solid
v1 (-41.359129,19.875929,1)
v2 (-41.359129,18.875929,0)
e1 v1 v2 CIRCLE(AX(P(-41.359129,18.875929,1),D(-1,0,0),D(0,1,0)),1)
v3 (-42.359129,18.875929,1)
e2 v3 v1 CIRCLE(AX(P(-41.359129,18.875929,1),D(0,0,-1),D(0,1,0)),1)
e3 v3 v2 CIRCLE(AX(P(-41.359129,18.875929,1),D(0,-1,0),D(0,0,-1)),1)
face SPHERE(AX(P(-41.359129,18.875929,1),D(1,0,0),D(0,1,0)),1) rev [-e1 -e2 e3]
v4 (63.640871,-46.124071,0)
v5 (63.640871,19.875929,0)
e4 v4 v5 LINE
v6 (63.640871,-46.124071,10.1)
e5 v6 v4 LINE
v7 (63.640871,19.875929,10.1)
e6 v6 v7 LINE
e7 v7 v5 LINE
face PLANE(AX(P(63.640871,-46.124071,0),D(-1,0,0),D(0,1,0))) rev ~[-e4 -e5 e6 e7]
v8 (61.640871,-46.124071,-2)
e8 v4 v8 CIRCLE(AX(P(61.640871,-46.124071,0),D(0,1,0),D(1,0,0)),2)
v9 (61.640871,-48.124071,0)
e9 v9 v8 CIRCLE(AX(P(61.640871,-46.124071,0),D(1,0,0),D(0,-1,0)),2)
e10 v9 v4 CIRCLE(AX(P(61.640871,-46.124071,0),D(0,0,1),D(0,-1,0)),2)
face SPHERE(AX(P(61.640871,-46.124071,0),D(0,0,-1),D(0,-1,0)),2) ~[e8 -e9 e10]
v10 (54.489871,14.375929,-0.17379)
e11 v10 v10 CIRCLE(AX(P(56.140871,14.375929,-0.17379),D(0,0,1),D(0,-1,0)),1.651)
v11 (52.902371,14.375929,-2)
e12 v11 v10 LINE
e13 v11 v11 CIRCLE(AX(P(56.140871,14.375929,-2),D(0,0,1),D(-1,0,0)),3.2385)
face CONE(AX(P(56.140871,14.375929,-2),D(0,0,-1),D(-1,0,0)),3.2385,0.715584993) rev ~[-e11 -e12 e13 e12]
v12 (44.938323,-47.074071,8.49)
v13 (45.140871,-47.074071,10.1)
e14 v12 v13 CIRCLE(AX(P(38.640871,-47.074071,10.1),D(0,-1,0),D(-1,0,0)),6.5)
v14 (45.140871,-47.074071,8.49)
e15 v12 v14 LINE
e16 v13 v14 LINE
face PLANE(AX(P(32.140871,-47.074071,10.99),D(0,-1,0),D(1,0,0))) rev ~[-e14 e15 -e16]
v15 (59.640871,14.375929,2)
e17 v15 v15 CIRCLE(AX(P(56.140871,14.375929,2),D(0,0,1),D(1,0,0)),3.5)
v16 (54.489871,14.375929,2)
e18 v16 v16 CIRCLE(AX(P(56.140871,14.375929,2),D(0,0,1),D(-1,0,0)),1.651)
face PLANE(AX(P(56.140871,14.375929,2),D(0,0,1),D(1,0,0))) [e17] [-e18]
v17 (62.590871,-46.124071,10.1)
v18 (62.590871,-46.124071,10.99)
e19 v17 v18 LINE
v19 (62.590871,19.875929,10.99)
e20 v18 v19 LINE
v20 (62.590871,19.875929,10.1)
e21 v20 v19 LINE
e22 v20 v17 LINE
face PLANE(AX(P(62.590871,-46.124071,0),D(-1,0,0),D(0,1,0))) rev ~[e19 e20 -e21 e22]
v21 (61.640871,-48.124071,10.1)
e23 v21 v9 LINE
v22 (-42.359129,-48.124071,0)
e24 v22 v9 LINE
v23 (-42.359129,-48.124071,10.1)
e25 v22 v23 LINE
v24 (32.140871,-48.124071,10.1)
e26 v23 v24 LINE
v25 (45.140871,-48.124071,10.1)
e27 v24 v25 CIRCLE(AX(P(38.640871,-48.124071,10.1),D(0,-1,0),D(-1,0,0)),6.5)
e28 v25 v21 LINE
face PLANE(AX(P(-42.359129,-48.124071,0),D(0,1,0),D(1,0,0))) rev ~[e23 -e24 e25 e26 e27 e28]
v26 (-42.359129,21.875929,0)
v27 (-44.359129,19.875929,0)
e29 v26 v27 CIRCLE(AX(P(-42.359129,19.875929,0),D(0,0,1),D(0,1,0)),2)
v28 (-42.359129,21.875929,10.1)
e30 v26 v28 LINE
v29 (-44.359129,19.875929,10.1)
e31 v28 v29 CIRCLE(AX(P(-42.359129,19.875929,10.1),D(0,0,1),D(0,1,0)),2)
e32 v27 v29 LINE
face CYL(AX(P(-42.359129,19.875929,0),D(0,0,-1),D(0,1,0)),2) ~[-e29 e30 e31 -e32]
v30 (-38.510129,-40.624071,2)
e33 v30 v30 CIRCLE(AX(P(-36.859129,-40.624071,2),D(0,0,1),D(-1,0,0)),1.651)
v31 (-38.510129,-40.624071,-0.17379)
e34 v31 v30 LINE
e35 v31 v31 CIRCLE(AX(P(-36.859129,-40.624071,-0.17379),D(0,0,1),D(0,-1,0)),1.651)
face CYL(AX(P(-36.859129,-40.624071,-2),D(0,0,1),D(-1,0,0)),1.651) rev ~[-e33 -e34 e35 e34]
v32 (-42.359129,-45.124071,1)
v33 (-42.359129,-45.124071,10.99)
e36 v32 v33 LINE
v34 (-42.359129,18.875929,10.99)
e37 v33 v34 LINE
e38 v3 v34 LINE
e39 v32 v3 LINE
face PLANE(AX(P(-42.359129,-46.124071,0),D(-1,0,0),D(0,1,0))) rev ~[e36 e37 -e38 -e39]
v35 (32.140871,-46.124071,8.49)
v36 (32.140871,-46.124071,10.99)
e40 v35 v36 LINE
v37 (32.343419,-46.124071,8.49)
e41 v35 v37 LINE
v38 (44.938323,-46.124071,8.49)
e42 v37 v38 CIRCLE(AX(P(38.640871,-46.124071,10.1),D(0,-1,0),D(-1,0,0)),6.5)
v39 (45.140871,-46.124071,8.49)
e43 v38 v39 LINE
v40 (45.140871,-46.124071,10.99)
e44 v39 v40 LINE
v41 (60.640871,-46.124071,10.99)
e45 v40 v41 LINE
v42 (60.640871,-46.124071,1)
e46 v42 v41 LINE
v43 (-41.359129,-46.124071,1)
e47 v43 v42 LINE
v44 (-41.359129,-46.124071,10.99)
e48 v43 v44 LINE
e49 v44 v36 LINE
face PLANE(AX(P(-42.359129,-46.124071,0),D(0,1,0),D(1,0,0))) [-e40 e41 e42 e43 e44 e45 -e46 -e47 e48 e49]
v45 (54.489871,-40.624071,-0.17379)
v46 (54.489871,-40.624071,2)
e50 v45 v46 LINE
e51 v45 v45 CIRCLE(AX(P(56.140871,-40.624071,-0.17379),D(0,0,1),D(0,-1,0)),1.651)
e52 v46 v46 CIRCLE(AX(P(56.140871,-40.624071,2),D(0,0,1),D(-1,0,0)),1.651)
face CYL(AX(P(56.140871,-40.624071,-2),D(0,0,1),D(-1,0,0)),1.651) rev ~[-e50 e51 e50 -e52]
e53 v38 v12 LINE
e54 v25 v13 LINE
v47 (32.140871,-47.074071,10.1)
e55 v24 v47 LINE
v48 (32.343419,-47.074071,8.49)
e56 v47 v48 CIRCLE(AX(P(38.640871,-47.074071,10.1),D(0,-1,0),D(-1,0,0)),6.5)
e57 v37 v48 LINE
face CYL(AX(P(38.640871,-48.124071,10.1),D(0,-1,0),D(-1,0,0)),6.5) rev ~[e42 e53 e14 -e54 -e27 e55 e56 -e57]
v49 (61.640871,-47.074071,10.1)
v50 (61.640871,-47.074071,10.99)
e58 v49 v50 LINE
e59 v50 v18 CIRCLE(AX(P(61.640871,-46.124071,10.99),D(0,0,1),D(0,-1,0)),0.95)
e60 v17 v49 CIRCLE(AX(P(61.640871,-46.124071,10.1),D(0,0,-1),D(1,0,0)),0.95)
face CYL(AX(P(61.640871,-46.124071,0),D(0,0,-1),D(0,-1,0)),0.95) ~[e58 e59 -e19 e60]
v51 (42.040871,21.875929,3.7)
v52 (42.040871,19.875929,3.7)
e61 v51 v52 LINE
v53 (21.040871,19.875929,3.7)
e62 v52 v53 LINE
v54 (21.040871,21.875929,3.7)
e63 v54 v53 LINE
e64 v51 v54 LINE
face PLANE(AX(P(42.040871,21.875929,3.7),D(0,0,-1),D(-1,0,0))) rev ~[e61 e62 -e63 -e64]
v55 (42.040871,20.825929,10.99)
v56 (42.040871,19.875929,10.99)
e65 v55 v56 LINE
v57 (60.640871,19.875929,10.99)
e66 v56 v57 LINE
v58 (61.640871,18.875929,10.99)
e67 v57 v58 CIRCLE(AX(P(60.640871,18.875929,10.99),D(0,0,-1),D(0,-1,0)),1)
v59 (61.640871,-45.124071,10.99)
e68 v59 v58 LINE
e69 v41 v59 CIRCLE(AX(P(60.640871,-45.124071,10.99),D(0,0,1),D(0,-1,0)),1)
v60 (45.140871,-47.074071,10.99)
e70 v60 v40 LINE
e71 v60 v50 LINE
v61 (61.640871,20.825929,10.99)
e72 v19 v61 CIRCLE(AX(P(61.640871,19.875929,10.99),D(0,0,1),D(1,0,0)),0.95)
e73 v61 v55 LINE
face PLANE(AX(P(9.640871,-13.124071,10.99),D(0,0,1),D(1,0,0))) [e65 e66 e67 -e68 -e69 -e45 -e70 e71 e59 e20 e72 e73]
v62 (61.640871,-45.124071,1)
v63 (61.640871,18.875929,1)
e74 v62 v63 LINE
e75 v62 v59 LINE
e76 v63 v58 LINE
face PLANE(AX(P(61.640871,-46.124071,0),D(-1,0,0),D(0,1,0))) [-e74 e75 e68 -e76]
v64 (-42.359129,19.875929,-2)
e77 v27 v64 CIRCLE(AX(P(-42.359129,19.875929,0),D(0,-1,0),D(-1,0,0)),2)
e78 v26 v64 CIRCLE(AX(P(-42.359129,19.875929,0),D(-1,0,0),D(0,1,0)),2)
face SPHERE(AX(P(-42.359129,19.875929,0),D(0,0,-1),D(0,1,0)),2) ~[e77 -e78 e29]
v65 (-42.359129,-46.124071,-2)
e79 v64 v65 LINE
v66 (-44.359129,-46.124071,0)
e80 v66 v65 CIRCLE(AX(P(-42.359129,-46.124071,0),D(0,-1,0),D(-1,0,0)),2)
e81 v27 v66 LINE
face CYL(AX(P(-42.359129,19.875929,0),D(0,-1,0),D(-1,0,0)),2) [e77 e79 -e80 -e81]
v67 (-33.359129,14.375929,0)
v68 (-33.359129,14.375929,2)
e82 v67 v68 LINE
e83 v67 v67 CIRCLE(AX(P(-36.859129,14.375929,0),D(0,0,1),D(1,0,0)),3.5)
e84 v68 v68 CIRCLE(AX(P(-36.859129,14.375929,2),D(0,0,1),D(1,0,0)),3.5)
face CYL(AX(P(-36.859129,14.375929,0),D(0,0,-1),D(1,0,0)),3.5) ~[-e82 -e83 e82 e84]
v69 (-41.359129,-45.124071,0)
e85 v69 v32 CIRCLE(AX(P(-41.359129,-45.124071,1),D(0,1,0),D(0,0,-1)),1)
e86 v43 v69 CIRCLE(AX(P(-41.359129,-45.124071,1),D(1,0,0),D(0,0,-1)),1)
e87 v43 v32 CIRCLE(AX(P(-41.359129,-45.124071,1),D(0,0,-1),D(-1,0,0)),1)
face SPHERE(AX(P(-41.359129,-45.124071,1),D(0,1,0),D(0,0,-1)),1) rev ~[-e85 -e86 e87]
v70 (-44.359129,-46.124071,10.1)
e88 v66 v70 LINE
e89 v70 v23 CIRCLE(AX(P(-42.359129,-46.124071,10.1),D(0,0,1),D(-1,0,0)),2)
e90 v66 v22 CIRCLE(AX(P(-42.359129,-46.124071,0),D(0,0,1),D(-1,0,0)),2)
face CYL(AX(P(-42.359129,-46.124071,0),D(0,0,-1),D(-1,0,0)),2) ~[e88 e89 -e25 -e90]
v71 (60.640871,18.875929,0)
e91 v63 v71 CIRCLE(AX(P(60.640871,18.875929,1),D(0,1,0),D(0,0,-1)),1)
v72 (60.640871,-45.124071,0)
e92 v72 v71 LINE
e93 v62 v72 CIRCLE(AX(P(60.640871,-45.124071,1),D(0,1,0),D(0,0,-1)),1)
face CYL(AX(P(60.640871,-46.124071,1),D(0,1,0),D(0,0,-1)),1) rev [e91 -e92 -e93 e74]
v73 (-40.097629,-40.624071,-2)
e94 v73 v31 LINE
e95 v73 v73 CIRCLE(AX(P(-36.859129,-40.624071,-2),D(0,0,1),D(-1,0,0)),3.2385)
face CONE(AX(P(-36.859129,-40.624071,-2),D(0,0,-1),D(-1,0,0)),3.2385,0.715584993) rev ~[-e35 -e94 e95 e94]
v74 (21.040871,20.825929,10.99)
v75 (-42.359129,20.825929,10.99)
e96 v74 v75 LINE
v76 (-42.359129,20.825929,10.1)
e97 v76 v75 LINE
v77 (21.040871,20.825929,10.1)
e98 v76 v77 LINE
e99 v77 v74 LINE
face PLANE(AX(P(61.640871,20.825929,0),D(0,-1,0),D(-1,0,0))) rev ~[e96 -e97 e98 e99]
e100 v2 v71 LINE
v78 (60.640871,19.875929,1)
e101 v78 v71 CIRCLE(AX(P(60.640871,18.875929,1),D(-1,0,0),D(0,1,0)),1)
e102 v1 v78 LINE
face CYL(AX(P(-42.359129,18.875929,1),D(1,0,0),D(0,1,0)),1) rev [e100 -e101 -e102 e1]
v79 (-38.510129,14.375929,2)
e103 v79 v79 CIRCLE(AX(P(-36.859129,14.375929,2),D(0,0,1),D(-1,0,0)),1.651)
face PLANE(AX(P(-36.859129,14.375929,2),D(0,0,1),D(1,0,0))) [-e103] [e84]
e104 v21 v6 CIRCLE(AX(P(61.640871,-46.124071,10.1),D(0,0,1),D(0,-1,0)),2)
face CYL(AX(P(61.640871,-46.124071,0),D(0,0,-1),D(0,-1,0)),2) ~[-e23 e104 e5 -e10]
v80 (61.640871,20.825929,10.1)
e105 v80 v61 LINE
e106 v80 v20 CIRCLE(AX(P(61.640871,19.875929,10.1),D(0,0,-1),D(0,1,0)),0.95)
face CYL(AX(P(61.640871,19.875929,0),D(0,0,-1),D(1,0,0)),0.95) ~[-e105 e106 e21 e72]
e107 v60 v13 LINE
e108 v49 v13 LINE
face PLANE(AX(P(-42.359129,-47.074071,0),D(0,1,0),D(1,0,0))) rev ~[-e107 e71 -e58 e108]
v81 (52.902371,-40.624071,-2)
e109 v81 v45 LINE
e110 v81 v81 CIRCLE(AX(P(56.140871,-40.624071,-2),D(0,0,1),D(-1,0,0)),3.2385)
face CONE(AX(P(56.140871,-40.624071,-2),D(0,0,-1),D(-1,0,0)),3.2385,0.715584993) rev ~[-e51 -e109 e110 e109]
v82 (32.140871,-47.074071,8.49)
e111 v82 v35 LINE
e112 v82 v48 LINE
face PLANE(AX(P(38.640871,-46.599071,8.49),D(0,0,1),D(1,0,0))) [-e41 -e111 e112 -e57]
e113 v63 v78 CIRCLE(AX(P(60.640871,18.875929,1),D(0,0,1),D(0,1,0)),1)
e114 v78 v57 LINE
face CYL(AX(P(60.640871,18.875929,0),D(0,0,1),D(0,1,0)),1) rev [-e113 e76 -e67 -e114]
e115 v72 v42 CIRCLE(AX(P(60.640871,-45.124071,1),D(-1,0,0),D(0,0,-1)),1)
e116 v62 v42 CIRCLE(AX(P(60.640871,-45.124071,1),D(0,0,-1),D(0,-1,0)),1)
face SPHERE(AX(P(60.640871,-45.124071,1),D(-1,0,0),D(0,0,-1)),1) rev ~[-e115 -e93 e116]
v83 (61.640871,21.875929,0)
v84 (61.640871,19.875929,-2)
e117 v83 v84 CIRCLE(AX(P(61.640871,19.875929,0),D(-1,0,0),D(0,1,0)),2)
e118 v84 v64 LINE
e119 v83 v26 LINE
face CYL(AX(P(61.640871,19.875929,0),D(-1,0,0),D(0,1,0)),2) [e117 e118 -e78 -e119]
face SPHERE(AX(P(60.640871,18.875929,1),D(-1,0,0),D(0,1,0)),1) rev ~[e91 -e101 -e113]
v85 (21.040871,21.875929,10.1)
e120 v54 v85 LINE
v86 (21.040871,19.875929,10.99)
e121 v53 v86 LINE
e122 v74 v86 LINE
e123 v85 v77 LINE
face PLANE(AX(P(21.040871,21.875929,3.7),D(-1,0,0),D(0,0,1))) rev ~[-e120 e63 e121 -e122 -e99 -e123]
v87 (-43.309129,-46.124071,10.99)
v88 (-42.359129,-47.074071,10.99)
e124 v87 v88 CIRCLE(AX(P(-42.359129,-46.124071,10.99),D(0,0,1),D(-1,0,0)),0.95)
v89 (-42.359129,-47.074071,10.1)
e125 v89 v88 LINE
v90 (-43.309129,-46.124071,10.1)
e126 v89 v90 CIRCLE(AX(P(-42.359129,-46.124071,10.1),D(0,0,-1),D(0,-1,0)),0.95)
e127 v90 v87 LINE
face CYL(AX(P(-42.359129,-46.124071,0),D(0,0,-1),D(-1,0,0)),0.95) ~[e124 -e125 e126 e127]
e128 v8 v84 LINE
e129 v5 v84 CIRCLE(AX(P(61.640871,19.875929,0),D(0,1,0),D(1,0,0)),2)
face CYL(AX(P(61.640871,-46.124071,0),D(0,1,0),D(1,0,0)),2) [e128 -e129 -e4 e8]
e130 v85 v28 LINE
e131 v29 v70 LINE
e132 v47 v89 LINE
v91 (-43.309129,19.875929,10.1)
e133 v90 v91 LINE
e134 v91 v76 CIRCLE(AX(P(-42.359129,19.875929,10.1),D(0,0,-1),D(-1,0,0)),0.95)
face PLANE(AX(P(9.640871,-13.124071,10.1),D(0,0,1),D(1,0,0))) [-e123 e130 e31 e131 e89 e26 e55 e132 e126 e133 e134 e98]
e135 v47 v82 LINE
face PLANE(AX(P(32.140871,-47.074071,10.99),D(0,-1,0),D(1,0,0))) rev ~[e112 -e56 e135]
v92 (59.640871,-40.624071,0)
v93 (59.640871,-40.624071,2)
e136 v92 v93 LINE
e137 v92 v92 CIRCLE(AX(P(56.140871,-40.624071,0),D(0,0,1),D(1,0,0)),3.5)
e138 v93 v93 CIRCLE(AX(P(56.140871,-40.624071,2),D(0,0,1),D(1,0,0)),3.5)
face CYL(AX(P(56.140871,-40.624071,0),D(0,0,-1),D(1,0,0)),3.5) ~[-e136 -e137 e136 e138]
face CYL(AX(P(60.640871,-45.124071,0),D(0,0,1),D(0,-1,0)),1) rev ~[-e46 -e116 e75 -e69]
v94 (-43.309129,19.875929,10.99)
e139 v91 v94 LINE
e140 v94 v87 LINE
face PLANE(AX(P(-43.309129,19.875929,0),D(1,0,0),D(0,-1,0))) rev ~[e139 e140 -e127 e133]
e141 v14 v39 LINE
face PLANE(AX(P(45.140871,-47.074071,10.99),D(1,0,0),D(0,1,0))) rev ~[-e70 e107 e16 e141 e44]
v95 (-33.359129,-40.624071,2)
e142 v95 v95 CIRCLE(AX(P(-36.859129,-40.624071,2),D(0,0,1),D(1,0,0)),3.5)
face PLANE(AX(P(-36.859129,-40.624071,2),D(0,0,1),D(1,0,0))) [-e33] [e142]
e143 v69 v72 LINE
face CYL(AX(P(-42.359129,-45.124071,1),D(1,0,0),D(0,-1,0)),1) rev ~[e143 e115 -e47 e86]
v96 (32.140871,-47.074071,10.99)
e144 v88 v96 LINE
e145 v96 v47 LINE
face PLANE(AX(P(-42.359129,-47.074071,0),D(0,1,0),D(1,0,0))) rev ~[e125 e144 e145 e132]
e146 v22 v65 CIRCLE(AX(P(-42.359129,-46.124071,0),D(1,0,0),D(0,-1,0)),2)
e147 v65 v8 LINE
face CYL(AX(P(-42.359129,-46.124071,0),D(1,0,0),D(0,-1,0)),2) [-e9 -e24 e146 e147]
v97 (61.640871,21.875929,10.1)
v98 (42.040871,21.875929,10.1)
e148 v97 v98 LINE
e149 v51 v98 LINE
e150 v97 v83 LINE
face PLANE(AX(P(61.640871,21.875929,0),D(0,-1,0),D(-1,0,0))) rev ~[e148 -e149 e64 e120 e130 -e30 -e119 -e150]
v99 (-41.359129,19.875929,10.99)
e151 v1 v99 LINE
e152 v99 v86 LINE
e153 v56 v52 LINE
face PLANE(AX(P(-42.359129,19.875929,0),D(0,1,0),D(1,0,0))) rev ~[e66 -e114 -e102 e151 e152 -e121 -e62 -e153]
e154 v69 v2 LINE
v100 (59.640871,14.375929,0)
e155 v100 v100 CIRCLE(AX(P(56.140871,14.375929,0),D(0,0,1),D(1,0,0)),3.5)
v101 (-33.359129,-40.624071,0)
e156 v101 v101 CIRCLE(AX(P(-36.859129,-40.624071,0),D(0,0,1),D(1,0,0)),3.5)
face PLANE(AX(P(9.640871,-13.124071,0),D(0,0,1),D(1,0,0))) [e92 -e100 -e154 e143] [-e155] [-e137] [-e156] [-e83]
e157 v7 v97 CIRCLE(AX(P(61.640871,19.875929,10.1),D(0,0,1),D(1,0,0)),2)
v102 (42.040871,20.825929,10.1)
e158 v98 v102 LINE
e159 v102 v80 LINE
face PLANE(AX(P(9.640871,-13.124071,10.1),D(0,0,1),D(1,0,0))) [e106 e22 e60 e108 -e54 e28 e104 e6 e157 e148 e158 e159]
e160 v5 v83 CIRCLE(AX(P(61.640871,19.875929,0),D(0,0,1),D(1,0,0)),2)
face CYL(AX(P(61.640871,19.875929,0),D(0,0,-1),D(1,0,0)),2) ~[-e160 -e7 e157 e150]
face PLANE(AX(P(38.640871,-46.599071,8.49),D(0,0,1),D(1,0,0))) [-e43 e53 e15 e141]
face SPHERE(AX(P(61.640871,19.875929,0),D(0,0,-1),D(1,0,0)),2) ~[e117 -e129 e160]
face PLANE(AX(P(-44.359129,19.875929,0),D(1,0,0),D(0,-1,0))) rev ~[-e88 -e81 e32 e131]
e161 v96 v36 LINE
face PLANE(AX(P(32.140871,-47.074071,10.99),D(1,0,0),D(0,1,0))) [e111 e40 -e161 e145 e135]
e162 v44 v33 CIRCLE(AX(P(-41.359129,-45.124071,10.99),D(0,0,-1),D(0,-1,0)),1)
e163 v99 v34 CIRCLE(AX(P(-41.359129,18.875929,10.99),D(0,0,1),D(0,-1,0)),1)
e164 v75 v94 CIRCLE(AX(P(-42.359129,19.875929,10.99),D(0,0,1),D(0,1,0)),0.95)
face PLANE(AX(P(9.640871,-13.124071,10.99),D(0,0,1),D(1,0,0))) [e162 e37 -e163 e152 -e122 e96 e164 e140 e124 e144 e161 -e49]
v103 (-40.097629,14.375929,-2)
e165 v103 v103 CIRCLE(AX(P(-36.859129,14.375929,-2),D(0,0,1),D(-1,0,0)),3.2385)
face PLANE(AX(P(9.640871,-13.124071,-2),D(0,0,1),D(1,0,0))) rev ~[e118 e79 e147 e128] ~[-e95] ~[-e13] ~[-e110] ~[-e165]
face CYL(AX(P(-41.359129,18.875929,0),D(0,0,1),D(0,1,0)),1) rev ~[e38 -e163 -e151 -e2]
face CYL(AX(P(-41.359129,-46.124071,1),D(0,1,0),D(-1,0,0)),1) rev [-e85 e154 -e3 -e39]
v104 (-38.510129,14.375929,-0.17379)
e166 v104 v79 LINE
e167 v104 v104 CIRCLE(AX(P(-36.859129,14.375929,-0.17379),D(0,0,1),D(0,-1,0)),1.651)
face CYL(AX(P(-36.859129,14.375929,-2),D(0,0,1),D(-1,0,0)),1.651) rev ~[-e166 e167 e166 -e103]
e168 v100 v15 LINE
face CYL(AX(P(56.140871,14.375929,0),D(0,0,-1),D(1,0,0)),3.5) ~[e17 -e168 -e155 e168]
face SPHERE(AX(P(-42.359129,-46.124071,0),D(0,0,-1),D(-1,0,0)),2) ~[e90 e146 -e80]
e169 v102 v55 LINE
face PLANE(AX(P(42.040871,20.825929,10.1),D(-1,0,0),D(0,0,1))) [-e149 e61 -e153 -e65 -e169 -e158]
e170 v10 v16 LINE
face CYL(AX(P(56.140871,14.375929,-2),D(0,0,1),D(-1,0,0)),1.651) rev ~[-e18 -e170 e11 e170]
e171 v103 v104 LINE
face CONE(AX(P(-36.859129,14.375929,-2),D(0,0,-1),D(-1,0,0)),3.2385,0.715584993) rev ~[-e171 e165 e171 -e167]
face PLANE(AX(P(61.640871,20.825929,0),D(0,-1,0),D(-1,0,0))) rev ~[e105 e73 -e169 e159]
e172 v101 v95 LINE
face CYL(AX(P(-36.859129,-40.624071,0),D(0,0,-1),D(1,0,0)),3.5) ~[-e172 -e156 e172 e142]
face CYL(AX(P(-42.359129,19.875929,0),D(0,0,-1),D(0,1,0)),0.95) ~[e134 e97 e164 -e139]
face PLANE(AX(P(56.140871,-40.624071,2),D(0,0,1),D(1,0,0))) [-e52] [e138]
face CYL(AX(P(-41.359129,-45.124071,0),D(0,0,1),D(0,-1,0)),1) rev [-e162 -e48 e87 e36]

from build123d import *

# Parameters (mm, degrees)
F0_W           = 104
F0_H           = 66
F0_R           = 3
F1_DEPTH       = 2
F2_DEPTH       = 10.99
F3_DEPTH       = 10.1
F4_R           = 3.5
F5_DEPTH       = 2
F7_D           = 3.302
F7_CSINK_D     = 6.477
F7_CSINK_ANGLE = 82
F8_W           = 21
F8_H           = 6.4
F9_DEPTH       = 2.5
F10_W          = 13
F10_H          = 0.95
F11_DEPTH      = 2.5
F13_DEPTH      = 2.5
F14_R          = 2
F15_R          = 1
F16_W          = 21
F16_H          = 0.89
F17_DEPTH      = 2.5


# Not quite as in the source:
# - a feature names something its author has since deleted; it is built from what else it names


with BuildPart() as f1:
    # F0 (on Top) → F1 (new body)
    with BuildSketch(Plane.XY):
        with BuildLine():
            Line((61.6408709802, 21.8759292028), (-42.3591290198, 21.8759292028))
            ThreePointArc((-42.3591290198, 21.8759292028), (-43.7733425821, 21.2901427652), (-44.3591290198, 19.8759292028))
            Line((-44.3591290198, 19.8759292028), (-44.3591290198, -46.1240707972))
            ThreePointArc((-44.3591290198, -46.1240707972), (-43.7733425821, -47.5382843595), (-42.3591290198, -48.1240707972))
            Line((-42.3591290198, -48.1240707972), (61.6408709802, -48.1240707972))
            ThreePointArc((61.6408709802, -48.1240707972), (63.0550845426, -47.5382843595), (63.6408709802, -46.1240707972))
            Line((63.6408709802, -46.1240707972), (63.6408709802, 19.8759292028))
            ThreePointArc((63.6408709802, 19.8759292028), (63.0550845426, 21.2901427652), (61.6408709802, 21.8759292028))
        make_face()
        with BuildLine():
            ThreePointArc((-43.3091290198, 19.8759292028), (-43.0308804619, 20.547680645), (-42.3591290198, 20.8259292028))
            Line((-42.3591290198, 20.8259292028), (61.6408709802, 20.8259292028))
            ThreePointArc((61.6408709802, 20.8259292028), (62.3126224224, 20.547680645), (62.5908709802, 19.8759292028))
            Line((62.5908709802, 19.8759292028), (62.5908709802, -46.1240707972))
            ThreePointArc((62.5908709802, -46.1240707972), (62.3126224224, -46.7958222393), (61.6408709802, -47.0740707972))
            Line((61.6408709802, -47.0740707972), (-42.3591290198, -47.0740707972))
            ThreePointArc((-42.3591290198, -47.0740707972), (-43.0308804619, -46.7958222393), (-43.3091290198, -46.1240707972))
            Line((-43.3091290198, -46.1240707972), (-43.3091290198, 19.8759292028))
        make_face(mode=Mode.SUBTRACT)
        with BuildLine():
            Line((61.6408709802, 20.8259292028), (-42.3591290198, 20.8259292028))
            ThreePointArc((-42.3591290198, 20.8259292028), (-43.0308804619, 20.547680645), (-43.3091290198, 19.8759292028))
            Line((-43.3091290198, 19.8759292028), (-43.3091290198, -46.1240707972))
            ThreePointArc((-43.3091290198, -46.1240707972), (-43.0308804619, -46.7958222393), (-42.3591290198, -47.0740707972))
            Line((-42.3591290198, -47.0740707972), (61.6408709802, -47.0740707972))
            ThreePointArc((61.6408709802, -47.0740707972), (62.3126224224, -46.7958222393), (62.5908709802, -46.1240707972))
            Line((62.5908709802, -46.1240707972), (62.5908709802, 19.8759292028))
            ThreePointArc((62.5908709802, 19.8759292028), (62.3126224224, 20.547680645), (61.6408709802, 20.8259292028))
        make_face()
        with Locations((9.6408709802, -13.1240707972)):
            Rectangle(F0_W, F0_H, mode=Mode.SUBTRACT)
        with Locations((9.6408709802, -13.1240707972)):
            Rectangle(F0_W, F0_H)
        with Locations((-36.8591290198, -40.6240707972)):
            Circle(F0_R, mode=Mode.SUBTRACT)
        with Locations((57.1408709802, -40.6240707972)):
            Circle(F0_R, mode=Mode.SUBTRACT)
        with Locations((-36.8591290198, 14.3759292028)):
            Circle(F0_R, mode=Mode.SUBTRACT)
        with Locations((57.1408709802, 14.3759292028)):
            Circle(F0_R, mode=Mode.SUBTRACT)
        with Locations((-36.8591290198, -40.6240707972)):
            Circle(F0_R)
        with Locations((57.1408709802, -40.6240707972)):
            Circle(F0_R)
        with Locations((-36.8591290198, 14.3759292028)):
            Circle(F0_R)
        with Locations((57.1408709802, 14.3759292028)):
            Circle(F0_R)
    extrude(amount=-F1_DEPTH)

    # F0 (on Top) → F2 (join)
    with BuildSketch(Plane.XY):
        with BuildLine():
            Line((61.6408709802, 20.8259292028), (-42.3591290198, 20.8259292028))
            ThreePointArc((-42.3591290198, 20.8259292028), (-43.0308804619, 20.547680645), (-43.3091290198, 19.8759292028))
            Line((-43.3091290198, 19.8759292028), (-43.3091290198, -46.1240707972))
            ThreePointArc((-43.3091290198, -46.1240707972), (-43.0308804619, -46.7958222393), (-42.3591290198, -47.0740707972))
            Line((-42.3591290198, -47.0740707972), (61.6408709802, -47.0740707972))
            ThreePointArc((61.6408709802, -47.0740707972), (62.3126224224, -46.7958222393), (62.5908709802, -46.1240707972))
            Line((62.5908709802, -46.1240707972), (62.5908709802, 19.8759292028))
            ThreePointArc((62.5908709802, 19.8759292028), (62.3126224224, 20.547680645), (61.6408709802, 20.8259292028))
        make_face()
        with Locations((9.6408709802, -13.1240707972)):
            Rectangle(F0_W, F0_H, mode=Mode.SUBTRACT)
    extrude(amount=F2_DEPTH)

    # F0 (on Top) → F3 (join)
    with BuildSketch(Plane.XY):
        with BuildLine():
            Line((61.6408709802, 21.8759292028), (-42.3591290198, 21.8759292028))
            ThreePointArc((-42.3591290198, 21.8759292028), (-43.7733425821, 21.2901427652), (-44.3591290198, 19.8759292028))
            Line((-44.3591290198, 19.8759292028), (-44.3591290198, -46.1240707972))
            ThreePointArc((-44.3591290198, -46.1240707972), (-43.7733425821, -47.5382843595), (-42.3591290198, -48.1240707972))
            Line((-42.3591290198, -48.1240707972), (61.6408709802, -48.1240707972))
            ThreePointArc((61.6408709802, -48.1240707972), (63.0550845426, -47.5382843595), (63.6408709802, -46.1240707972))
            Line((63.6408709802, -46.1240707972), (63.6408709802, 19.8759292028))
            ThreePointArc((63.6408709802, 19.8759292028), (63.0550845426, 21.2901427652), (61.6408709802, 21.8759292028))
        make_face()
        with BuildLine():
            ThreePointArc((-43.3091290198, 19.8759292028), (-43.0308804619, 20.547680645), (-42.3591290198, 20.8259292028))
            Line((-42.3591290198, 20.8259292028), (61.6408709802, 20.8259292028))
            ThreePointArc((61.6408709802, 20.8259292028), (62.3126224224, 20.547680645), (62.5908709802, 19.8759292028))
            Line((62.5908709802, 19.8759292028), (62.5908709802, -46.1240707972))
            ThreePointArc((62.5908709802, -46.1240707972), (62.3126224224, -46.7958222393), (61.6408709802, -47.0740707972))
            Line((61.6408709802, -47.0740707972), (-42.3591290198, -47.0740707972))
            ThreePointArc((-42.3591290198, -47.0740707972), (-43.0308804619, -46.7958222393), (-43.3091290198, -46.1240707972))
            Line((-43.3091290198, -46.1240707972), (-43.3091290198, 19.8759292028))
        make_face(mode=Mode.SUBTRACT)
    extrude(amount=F3_DEPTH)

    # F4 (on face) → F5 (join)
    with BuildSketch(Plane.XY):
        with Locations((-36.8591290198, 14.3759292028)):
            Circle(F4_R)
        with Locations((56.1408709802, 14.3759292028)):
            Circle(F4_R)
        with Locations((56.1408709802, -40.6240707972)):
            Circle(F4_R)
        with Locations((-36.8591290198, -40.6240707972)):
            Circle(F4_R)
    extrude(amount=F5_DEPTH)

    # F7 (through all)
    with Locations(Plane(origin=(0, 0, -2), x_dir=(1, 0, 0), z_dir=(0, 0, -1))):
        with Locations((-36.8591290198, 40.6240707972), (56.1408709802, 40.6240707972), (56.1408709802, -14.3759292028), (-36.8591290198, -14.3759292028)):
            CounterSinkHole(F7_D / 2, F7_CSINK_D / 2, counter_sink_angle=F7_CSINK_ANGLE)

    # F8 (on face) → F9 (cut)
    with BuildSketch(Plane(origin=(0, 21.8759292028, 0), x_dir=(-1, 0, 0), z_dir=(0, 1, 0))):
        with Locations((-31.5408709802, 6.9)):
            Rectangle(F8_W, F8_H)
    extrude(amount=-F9_DEPTH, mode=Mode.SUBTRACT)

    # F10 (on face) → F11 (cut)
    with BuildSketch(Plane.XY.offset(10.99)):
        with Locations((38.6408709802, -46.5990707972)):
            Rectangle(F10_W, F10_H)
    extrude(amount=-F11_DEPTH, mode=Mode.SUBTRACT)

    # F12 (on face) → F13 (cut)
    with BuildSketch(Plane.XZ.offset(48.1240707972)):
        with BuildLine():
            ThreePointArc((32.1408709802, 10.1), (38.6408709802, 3.6), (45.1408709802, 10.1))
            Line((45.1408709802, 10.1), (32.1408709802, 10.1))
        make_face()
    extrude(amount=-F13_DEPTH, mode=Mode.SUBTRACT)

    # F14
    f14_edges = [f1.edges().sort_by_distance(p)[0] for p in [
        (63.640871, -13.124071, -2),
        (9.640871, 21.875929, -2),
        (-44.359129, -13.124071, -2),
        (9.640871, -48.124071, -2),
        (63.055085, 21.290143, -2),
        (-43.773343, 21.290143, -2),
        (63.055085, -47.538284, -2),
        (-43.773343, -47.538284, -2),
    ]]
    fillet(f14_edges, radius=F14_R)

    # F15
    f15_edges = [f1.edges().sort_by_distance(p)[0] for p in [
        (9.640871, 19.875929, 0),
        (-42.359129, 19.875929, 5.495),
        (-42.359129, -13.124071, 0),
        (9.640871, -46.124071, 0),
        (-42.359129, -46.124071, 5.495),
        (61.640871, 19.875929, 5.495),
        (61.640871, -13.124071, 0),
        (61.640871, -46.124071, 5.495),
    ]]
    fillet(f15_edges, radius=F15_R)

    # F16 (on face) → F17 (cut)
    with BuildSketch(Plane(origin=(0, 20.8259292028, 0), x_dir=(-1, 0, 0), z_dir=(0, 1, 0))):
        with Locations((-31.5408709802, 10.545)):
            Rectangle(F16_W, F16_H)
    extrude(amount=-F17_DEPTH, mode=Mode.SUBTRACT)


solid = f1.part
